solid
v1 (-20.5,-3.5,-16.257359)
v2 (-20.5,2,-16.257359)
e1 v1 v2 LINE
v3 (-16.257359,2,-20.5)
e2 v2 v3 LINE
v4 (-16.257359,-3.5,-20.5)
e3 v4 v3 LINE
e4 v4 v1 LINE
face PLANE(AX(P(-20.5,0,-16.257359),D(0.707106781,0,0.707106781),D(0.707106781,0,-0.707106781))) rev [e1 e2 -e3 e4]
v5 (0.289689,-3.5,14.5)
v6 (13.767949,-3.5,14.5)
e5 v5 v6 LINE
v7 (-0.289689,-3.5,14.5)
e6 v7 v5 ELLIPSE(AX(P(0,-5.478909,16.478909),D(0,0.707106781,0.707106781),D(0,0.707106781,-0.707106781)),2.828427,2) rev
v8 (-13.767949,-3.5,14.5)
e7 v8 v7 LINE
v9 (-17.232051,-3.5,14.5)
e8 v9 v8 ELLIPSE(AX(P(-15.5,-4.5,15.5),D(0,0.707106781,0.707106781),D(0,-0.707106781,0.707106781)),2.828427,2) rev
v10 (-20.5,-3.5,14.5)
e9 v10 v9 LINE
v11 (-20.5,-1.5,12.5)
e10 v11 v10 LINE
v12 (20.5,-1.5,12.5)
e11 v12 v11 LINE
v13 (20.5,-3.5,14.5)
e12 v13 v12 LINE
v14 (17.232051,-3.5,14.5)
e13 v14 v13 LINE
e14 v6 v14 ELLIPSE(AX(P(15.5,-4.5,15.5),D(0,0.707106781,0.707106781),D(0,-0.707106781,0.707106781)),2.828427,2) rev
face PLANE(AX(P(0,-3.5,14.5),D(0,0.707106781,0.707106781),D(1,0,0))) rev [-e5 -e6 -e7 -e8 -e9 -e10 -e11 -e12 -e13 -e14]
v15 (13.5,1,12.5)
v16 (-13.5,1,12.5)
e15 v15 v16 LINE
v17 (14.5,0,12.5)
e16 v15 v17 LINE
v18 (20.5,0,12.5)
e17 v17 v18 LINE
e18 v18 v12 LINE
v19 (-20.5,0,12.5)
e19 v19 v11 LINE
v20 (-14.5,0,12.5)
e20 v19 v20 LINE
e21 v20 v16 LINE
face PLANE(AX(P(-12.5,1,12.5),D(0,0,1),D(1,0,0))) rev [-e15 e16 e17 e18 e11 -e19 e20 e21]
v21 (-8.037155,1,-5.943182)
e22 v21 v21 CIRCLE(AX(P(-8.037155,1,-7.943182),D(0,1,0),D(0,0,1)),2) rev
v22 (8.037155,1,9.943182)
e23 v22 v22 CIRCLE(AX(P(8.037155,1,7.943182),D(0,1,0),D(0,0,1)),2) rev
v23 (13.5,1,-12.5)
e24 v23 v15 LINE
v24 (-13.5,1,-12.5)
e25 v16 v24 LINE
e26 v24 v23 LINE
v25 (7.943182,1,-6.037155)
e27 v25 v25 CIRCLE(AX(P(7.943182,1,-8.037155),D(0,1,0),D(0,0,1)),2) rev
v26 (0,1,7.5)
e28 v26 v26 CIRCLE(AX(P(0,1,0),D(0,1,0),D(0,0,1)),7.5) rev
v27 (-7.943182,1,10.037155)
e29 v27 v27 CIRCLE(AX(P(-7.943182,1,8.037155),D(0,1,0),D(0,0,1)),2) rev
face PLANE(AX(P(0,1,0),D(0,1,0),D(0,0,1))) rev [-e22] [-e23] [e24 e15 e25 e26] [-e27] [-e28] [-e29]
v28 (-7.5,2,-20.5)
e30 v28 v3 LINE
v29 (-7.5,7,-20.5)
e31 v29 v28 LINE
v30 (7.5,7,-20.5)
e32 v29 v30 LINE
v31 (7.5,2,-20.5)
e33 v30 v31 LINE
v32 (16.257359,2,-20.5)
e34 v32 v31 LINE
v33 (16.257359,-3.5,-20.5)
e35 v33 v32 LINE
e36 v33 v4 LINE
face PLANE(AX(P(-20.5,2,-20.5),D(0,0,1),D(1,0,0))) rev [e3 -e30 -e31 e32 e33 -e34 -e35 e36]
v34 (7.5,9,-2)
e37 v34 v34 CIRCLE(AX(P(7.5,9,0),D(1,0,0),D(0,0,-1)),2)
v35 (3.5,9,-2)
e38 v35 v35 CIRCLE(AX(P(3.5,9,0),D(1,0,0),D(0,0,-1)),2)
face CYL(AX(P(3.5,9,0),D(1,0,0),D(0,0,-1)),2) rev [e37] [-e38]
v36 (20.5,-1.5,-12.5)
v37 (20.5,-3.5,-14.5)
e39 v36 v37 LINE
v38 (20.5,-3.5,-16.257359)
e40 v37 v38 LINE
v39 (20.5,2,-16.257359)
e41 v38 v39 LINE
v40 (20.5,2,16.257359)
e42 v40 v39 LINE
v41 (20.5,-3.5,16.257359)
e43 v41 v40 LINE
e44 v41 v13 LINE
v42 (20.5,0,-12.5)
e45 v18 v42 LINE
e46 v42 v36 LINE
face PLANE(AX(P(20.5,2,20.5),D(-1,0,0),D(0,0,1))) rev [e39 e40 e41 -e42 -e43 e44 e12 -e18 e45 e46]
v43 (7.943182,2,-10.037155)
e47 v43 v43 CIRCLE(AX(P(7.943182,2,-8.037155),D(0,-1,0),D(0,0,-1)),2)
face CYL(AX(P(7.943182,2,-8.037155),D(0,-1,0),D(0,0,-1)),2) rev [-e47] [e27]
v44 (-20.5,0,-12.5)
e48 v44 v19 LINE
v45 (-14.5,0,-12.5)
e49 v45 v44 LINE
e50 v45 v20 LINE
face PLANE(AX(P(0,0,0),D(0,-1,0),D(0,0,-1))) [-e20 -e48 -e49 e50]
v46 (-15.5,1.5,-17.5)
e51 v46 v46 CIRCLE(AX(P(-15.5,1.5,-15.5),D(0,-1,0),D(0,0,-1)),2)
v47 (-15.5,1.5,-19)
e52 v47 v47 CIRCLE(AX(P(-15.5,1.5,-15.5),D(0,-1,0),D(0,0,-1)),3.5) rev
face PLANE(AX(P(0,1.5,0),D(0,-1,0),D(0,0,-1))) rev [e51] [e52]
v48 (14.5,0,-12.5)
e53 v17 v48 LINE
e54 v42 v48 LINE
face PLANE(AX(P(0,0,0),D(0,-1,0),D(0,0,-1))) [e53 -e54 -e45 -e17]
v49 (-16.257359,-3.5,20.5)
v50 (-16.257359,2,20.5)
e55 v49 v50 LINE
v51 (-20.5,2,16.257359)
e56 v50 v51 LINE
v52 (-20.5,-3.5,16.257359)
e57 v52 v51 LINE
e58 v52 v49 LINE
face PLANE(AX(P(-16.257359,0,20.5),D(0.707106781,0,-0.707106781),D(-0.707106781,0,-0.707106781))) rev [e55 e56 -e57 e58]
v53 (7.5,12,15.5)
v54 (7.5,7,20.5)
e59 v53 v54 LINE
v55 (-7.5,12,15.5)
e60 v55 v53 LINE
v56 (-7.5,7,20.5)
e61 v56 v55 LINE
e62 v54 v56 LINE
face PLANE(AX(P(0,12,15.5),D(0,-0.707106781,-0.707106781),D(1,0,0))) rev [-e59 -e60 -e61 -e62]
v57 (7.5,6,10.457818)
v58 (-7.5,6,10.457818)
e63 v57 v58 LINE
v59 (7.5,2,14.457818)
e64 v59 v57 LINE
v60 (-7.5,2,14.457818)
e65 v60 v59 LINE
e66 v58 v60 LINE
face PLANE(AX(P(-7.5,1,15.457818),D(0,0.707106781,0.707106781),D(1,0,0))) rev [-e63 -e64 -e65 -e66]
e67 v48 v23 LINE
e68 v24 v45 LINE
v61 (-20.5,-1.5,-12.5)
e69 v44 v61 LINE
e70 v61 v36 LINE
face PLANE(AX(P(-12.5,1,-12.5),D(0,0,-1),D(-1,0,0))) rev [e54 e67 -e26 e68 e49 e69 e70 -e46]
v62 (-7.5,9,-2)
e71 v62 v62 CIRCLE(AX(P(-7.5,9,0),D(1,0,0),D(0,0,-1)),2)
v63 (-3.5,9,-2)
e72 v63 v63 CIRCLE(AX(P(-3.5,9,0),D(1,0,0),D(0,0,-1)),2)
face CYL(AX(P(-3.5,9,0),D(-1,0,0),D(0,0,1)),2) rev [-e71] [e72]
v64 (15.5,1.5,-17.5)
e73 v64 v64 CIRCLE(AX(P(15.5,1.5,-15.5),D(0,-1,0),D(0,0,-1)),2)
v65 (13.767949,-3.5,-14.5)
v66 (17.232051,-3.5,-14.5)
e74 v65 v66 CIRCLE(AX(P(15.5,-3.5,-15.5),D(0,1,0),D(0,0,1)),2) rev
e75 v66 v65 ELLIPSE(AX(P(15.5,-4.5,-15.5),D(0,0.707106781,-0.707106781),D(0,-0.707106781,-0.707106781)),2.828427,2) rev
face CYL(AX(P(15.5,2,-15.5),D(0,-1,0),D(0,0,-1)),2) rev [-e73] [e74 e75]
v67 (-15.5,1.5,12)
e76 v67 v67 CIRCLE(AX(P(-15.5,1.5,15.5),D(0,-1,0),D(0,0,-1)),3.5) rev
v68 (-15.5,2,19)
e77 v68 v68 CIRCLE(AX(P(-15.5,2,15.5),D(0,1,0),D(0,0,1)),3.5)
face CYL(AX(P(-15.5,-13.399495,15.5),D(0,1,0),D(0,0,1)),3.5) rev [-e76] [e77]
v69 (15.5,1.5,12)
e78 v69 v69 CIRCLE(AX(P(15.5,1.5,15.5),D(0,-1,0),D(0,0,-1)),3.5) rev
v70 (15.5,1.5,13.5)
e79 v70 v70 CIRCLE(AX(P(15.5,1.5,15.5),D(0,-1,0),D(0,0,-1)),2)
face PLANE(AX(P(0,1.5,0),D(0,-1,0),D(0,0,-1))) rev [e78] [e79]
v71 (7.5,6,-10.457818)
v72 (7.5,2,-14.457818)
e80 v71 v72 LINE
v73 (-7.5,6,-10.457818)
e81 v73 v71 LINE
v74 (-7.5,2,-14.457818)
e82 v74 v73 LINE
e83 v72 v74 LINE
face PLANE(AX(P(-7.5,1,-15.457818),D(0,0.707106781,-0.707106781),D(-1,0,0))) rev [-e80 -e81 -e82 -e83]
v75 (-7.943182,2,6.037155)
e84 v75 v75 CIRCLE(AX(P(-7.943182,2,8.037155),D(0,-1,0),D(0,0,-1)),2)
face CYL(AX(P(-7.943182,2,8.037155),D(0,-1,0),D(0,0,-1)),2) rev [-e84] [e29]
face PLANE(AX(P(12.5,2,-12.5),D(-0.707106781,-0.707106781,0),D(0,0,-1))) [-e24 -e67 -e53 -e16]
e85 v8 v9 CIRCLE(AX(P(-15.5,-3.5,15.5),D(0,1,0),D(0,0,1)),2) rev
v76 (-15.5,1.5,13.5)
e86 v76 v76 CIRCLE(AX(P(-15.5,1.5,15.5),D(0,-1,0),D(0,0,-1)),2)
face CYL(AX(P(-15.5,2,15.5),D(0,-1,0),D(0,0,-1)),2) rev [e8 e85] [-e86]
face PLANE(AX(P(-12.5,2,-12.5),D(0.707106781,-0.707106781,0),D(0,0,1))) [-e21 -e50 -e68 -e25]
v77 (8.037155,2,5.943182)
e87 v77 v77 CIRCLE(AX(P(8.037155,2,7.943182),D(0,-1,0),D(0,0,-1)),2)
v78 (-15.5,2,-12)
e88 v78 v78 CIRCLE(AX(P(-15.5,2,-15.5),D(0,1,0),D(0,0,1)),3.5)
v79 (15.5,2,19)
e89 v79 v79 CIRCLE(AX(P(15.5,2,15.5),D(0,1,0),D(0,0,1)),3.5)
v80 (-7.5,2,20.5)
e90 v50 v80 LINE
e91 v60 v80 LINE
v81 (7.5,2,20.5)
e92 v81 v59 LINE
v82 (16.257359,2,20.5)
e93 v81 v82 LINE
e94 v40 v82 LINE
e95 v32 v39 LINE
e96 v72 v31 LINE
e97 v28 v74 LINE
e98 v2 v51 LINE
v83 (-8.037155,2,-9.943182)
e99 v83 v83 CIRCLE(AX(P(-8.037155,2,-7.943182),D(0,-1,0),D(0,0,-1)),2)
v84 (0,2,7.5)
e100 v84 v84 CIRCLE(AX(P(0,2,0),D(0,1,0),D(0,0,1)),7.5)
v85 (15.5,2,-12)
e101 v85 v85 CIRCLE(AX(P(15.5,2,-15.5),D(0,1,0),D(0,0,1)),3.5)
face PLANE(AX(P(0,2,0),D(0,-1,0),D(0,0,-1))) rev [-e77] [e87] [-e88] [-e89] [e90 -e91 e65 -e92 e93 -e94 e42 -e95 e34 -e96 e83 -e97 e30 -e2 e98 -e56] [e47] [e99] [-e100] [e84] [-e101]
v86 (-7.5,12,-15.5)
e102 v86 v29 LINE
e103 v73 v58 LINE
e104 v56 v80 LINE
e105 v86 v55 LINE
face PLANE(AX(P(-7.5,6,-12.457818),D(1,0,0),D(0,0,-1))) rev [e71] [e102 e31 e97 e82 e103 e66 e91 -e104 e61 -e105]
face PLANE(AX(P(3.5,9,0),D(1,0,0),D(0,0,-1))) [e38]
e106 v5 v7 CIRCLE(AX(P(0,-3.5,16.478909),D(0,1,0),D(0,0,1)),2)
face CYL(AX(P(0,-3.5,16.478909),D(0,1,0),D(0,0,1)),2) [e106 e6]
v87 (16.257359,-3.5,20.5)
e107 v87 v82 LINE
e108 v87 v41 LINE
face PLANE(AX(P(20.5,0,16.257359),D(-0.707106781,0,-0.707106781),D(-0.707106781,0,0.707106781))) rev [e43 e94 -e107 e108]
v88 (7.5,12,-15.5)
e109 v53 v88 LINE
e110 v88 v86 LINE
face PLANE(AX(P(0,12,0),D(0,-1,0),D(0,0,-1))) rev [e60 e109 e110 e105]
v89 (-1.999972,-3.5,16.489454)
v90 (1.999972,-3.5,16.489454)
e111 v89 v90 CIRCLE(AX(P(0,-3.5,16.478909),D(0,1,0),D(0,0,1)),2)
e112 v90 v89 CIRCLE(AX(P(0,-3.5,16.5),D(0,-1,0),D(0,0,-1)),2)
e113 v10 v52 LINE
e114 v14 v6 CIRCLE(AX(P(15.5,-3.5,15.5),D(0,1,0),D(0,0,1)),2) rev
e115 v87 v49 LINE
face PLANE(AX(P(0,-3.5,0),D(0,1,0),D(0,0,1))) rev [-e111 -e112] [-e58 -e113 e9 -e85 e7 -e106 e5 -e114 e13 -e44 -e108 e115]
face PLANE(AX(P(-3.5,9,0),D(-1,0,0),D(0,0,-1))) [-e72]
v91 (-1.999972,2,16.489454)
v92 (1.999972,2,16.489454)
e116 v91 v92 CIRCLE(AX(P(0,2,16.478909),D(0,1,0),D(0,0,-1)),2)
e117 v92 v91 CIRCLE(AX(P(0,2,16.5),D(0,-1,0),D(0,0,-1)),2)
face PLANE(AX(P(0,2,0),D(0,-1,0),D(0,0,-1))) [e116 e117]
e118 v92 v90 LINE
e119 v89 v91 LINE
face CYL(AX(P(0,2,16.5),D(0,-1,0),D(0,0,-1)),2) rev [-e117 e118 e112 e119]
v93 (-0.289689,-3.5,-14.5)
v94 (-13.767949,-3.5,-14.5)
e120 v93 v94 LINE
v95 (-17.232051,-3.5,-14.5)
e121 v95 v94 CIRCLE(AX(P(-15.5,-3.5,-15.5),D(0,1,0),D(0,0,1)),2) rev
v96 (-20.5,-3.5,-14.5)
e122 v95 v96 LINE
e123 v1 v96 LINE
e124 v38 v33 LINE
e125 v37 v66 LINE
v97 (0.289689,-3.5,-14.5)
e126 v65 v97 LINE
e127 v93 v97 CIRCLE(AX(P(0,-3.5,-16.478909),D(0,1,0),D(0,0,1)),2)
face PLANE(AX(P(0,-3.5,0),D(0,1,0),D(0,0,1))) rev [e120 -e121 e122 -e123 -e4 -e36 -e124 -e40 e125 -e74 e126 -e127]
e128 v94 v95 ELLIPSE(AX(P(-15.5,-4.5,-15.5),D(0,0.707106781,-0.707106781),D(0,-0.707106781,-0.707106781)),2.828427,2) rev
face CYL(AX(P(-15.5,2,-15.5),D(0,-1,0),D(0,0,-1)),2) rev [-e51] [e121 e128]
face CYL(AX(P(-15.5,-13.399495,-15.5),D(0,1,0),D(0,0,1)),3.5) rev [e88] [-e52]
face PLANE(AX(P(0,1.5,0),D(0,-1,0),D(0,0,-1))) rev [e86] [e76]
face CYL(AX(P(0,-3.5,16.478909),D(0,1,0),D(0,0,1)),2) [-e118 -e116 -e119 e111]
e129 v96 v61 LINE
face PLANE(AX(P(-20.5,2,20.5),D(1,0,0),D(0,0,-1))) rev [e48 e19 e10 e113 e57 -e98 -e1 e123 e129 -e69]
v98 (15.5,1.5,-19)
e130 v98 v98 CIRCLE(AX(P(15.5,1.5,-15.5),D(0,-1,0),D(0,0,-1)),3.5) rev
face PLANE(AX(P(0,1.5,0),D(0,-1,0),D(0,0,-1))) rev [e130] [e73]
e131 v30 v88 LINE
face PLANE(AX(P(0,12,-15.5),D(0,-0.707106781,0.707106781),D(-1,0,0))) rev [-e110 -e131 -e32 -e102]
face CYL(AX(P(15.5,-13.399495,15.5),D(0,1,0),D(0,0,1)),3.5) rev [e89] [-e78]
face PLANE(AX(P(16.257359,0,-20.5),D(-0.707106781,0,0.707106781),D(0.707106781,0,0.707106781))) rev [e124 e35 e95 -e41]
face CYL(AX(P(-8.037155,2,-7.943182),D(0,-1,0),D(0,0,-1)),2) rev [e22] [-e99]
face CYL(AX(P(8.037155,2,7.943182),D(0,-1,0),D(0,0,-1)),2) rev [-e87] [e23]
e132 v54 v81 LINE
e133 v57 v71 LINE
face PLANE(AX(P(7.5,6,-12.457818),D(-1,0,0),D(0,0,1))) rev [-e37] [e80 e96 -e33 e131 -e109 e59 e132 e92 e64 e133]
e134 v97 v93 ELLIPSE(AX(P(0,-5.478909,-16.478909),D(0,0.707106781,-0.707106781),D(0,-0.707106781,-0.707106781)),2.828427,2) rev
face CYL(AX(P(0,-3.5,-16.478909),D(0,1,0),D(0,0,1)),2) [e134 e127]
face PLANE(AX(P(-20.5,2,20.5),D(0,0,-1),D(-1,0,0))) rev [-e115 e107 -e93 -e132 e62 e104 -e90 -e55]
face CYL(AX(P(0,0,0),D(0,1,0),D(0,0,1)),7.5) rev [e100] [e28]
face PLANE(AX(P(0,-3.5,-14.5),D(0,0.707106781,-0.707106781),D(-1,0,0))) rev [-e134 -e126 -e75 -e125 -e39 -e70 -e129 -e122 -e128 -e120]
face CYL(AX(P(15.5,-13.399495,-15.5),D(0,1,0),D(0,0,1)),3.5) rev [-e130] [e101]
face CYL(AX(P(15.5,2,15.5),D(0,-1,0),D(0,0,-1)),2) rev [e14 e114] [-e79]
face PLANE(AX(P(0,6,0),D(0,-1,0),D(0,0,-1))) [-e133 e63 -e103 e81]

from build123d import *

# Parameters (mm, degrees)
SKETCH2_W           = 41
SKETCH2_H           = 41
BOSS_EXTRUDE1_DEPTH = 2
SKETCH3_R           = 2
CUT_EXTRUDE1_DEPTH  = 30.060282173
SKETCH4_R           = 7.5
CUT_EXTRUDE2_DEPTH  = 30.060282173
SKETCH5_W           = 25
SKETCH5_H           = 25
CUT_EXTRUDE3_DEPTH  = 1
CUT_EXTRUDE4_DEPTH  = 30.060282173
SKETCH7_R           = 2
CUT_EXTRUDE5_DEPTH  = 30.060282173
SKETCH8_W           = 25
SKETCH8_H           = 8
SKETCH8_H_2         = 7.957817611
BOSS_EXTRUDE2_DEPTH = 3.5
SKETCH9_R           = 2
CUT_EXTRUDE6_DEPTH  = 30.508473359
BOSS_EXTRUDE3_START = 3.5
SKETCH10_R          = 2
BOSS_EXTRUDE3_DEPTH = 3.5
SKETCH11_R          = 3.5
CUT_EXTRUDE7_DEPTH  = 3.5
SKETCH12_W          = 8
SKETCH12_H          = 2
BOSS_EXTRUDE4_DEPTH = 3.5
SKETCH13_R          = 3.5
CUT_EXTRUDE8_DEPTH  = 3.5
SKETCH14_R          = 3.5
SKETCH14_R_2        = 2
BOSS_EXTRUDE5_DEPTH = 3
SKETCH15_W          = 15
SKETCH15_H          = 8.042182389
SKETCH15_R          = 2
SKETCH15_H_2        = 8
BOSS_EXTRUDE6_DEPTH = 4
SKETCH16_W          = 8
SKETCH16_H          = 25
CUT_EXTRUDE9_DEPTH  = 3.5
CHAMFER3_SIZE       = 2
CHAMFER4_SIZE       = 2
SKETCH17_R          = 2
BOSS_EXTRUDE7_DEPTH = 9.5
SKETCH21_W          = 15
SKETCH21_H          = 30.915635222
CUT_EXTRUDE11_DEPTH = 4
SKETCH18_W          = 15
SKETCH18_H          = 41
BOSS_EXTRUDE8_DEPTH = 6
CHAMFER5_SIZE       = 5
SKETCH22_R          = 2
CUT_EXTRUDE12_DEPTH = 4


with BuildPart() as part:
    # Sketch2 → Boss-Extrude1 (new body)
    with BuildSketch(Plane(origin=(0, 0, 0), x_dir=(1, 0, 0), z_dir=(0, 1, 0))):
        Rectangle(SKETCH2_W, SKETCH2_H)
    extrude(amount=BOSS_EXTRUDE1_DEPTH)

    # Sketch3 → Cut-Extrude1 (cut, through all)
    with BuildSketch(Plane.XZ):
        with Locations(Location((-7.943181907, 8.037155044, 0), (0, 0, 270))):
            Circle(SKETCH3_R)
        with Locations(Location((8.037155044, 7.943181907, 0), (0, 0, 270))):
            Circle(SKETCH3_R)
        with Locations(Location((7.943181907, -8.037155044, 0), (0, 0, 270))):
            Circle(SKETCH3_R)
        with Locations(Location((-8.037155044, -7.943181907, 0), (0, 0, 270))):
            Circle(SKETCH3_R)
    extrude(amount=-CUT_EXTRUDE1_DEPTH, mode=Mode.SUBTRACT)

    # Sketch4 → Cut-Extrude2 (cut, through all)
    with BuildSketch(Plane(origin=(0, 2, 0), x_dir=(1, 0, 0), z_dir=(0, 1, 0))):
        with Locations(Location((0, 0, 0), (0, 0, 270))):
            Circle(SKETCH4_R)
    extrude(amount=-CUT_EXTRUDE2_DEPTH, mode=Mode.SUBTRACT)

    # Sketch5 → Cut-Extrude3 (cut)
    with BuildSketch(Plane.XZ):
        Rectangle(SKETCH5_W, SKETCH5_H)
    extrude(amount=-CUT_EXTRUDE3_DEPTH, mode=Mode.SUBTRACT)

    # Sketch6 → Cut-Extrude4 (cut, through all)
    with BuildSketch(Plane(origin=(0, 2, 0), x_dir=(1, 0, 0), z_dir=(0, 1, 0))):
        Polygon((-20.5, 16.257359313), (-16.257359313, 20.5), (-20.5, 20.5), align=None)
        Polygon((16.257359313, 20.5), (20.5, 16.257359313), (20.5, 20.5), align=None)
        Polygon((20.5, -16.257359313), (16.257359313, -20.5), (20.5, -20.5), align=None)
        Polygon((-16.257359313, -20.5), (-20.5, -16.257359313), (-20.5, -20.5), align=None)
    extrude(amount=-CUT_EXTRUDE4_DEPTH, mode=Mode.SUBTRACT)

    # Sketch7 → Cut-Extrude5 (cut, through all)
    with BuildSketch(Plane.XZ):
        with Locations(Location((-15.5, 15.5, 0), (0, 0, 270))):
            Circle(SKETCH7_R)
        with Locations(Location((15.5, 15.5, 0), (0, 0, 270))):
            Circle(SKETCH7_R)
        with Locations(Location((15.5, -15.5, 0), (0, 0, 270))):
            Circle(SKETCH7_R)
        with Locations(Location((-15.5, -15.5, 0), (0, 0, 270))):
            Circle(SKETCH7_R)
    extrude(amount=-CUT_EXTRUDE5_DEPTH, mode=Mode.SUBTRACT)

    # Sketch8 → Boss-Extrude2 (add)
    with BuildSketch(Plane.XZ):
        with Locations((0, 16.5)):
            Rectangle(SKETCH8_W, SKETCH8_H)
        with Locations((0, -16.478908806)):
            Rectangle(SKETCH8_W, SKETCH8_H_2)
    extrude(amount=BOSS_EXTRUDE2_DEPTH)

    # Sketch9 → Cut-Extrude6 (cut, through all)
    with BuildSketch(Plane.XZ.offset(3.5)):
        with Locations(Location((0, 16.5, 0), (0, 0, 270))):
            Circle(SKETCH9_R)
        with Locations(Location((0, -16.478908806, 0), (0, 0, 270))):
            Circle(SKETCH9_R)
    extrude(amount=-CUT_EXTRUDE6_DEPTH, mode=Mode.SUBTRACT)

    # Sketch10 → Boss-Extrude3 (add)
    # profile 1 of 3: a face of its own
    with BuildSketch(Plane.XZ.offset(BOSS_EXTRUDE3_START)):
        Polygon((-20.5, 16.257359313), (-20.5, 12.5), (-12.5, 12.5), (-12.5, 20.5), (-16.257359313, 20.5), align=None)
        with Locations(Location((-15.5, 15.5, 0), (0, 0, 270))):
            Circle(SKETCH10_R, mode=Mode.SUBTRACT)
    # profile 2 of 3: a face of its own
    with BuildSketch(Plane.XZ.offset(BOSS_EXTRUDE3_START)):
        Polygon((12.5, 12.5), (20.5, 12.5), (20.5, 16.257359313), (16.257359313, 20.5), (12.5, 20.5), align=None)
        with Locations(Location((15.5, 15.5, 0), (0, 0, 270))):
            Circle(SKETCH10_R, mode=Mode.SUBTRACT)
    # profile 3 of 3: a face of its own
    with BuildSketch(Plane.XZ.offset(BOSS_EXTRUDE3_START)):
        Polygon((-20.5, -12.5), (-20.5, -16.257359313), (-16.257359313, -20.5), (16.257359313, -20.5), (20.5, -16.257359313), (20.5, -12.5), (12.5, -12.5), (12.5, -20.457817611), (-12.5, -20.457817611), (-12.5, -12.5), align=None)
        with Locations(Location((-15.5, -15.5, 0), (0, 0, 270))):
            Circle(SKETCH10_R, mode=Mode.SUBTRACT)
        with Locations(Location((15.5, -15.5, 0), (0, 0, 270))):
            Circle(SKETCH10_R, mode=Mode.SUBTRACT)
    extrude(amount=-BOSS_EXTRUDE3_DEPTH)

    # Sketch11 → Cut-Extrude7 (cut)
    with BuildSketch(Plane(origin=(0, 2, 0), x_dir=(1, 0, 0), z_dir=(0, 1, 0))):
        with Locations(Location((-15.5, 15.5, 0), (0, 0, 270))):
            Circle(SKETCH11_R)
        with Locations(Location((15.5, 15.5, 0), (0, 0, 270))):
            Circle(SKETCH11_R)
        with Locations(Location((15.5, -15.5, 0), (0, 0, 270))):
            Circle(SKETCH11_R)
        with Locations(Location((-15.5, -15.5, 0), (0, 0, 270))):
            Circle(SKETCH11_R)
    extrude(amount=-CUT_EXTRUDE7_DEPTH, mode=Mode.SUBTRACT)

    # Sketch12 → Boss-Extrude4 (add)
    with BuildSketch(Plane.XZ):
        with Locations((-16.5, -11.5)):
            Rectangle(SKETCH12_W, SKETCH12_H)
        with Locations((-16.5, 11.5)):
            Rectangle(SKETCH12_W, SKETCH12_H)
        with Locations((16.5, -11.5)):
            Rectangle(SKETCH12_W, SKETCH12_H)
        with Locations((16.5, 11.5)):
            Rectangle(SKETCH12_W, SKETCH12_H)
    extrude(amount=BOSS_EXTRUDE4_DEPTH)

    # Sketch13 → Cut-Extrude8 (cut)
    with BuildSketch(Plane(origin=(0, 2, 0), x_dir=(1, 0, 0), z_dir=(0, 1, 0))):
        with Locations(Location((-15.5, 15.5, 0), (0, 0, 270))):
            Circle(SKETCH13_R)
        with Locations(Location((15.5, 15.5, 0), (0, 0, 270))):
            Circle(SKETCH13_R)
        with Locations(Location((15.5, -15.5, 0), (0, 0, 270))):
            Circle(SKETCH13_R)
        with Locations(Location((-15.5, -15.5, 0), (0, 0, 270))):
            Circle(SKETCH13_R)
    extrude(amount=-CUT_EXTRUDE8_DEPTH, mode=Mode.SUBTRACT)

    # Sketch14 → Boss-Extrude5 (add)
    # profile 1 of 4: a face of its own
    with BuildSketch(Plane(origin=(0, -1.5, 0), x_dir=(1, 0, 0), z_dir=(0, 1, 0))):
        with Locations(Location((-15.5, -15.5, 0), (0, 0, 270))):
            Circle(SKETCH14_R)
        with Locations(Location((-15.5, -15.5, 0), (0, 0, 90))):
            Circle(SKETCH14_R_2, mode=Mode.SUBTRACT)
    # profile 2 of 4: a face of its own
    with BuildSketch(Plane(origin=(0, -1.5, 0), x_dir=(1, 0, 0), z_dir=(0, 1, 0))):
        with Locations(Location((-15.5, 15.5, 0), (0, 0, 270))):
            Circle(SKETCH14_R)
        with Locations(Location((-15.5, 15.5, 0), (0, 0, 90))):
            Circle(SKETCH14_R_2, mode=Mode.SUBTRACT)
    # profile 3 of 4: a face of its own
    with BuildSketch(Plane(origin=(0, -1.5, 0), x_dir=(1, 0, 0), z_dir=(0, 1, 0))):
        with Locations(Location((15.5, 15.5, 0), (0, 0, 270))):
            Circle(SKETCH14_R)
        with Locations(Location((15.5, 15.5, 0), (0, 0, 90))):
            Circle(SKETCH14_R_2, mode=Mode.SUBTRACT)
    # profile 4 of 4: a face of its own
    with BuildSketch(Plane(origin=(0, -1.5, 0), x_dir=(1, 0, 0), z_dir=(0, 1, 0))):
        with Locations(Location((15.5, -15.5, 0), (0, 0, 270))):
            Circle(SKETCH14_R)
        with Locations(Location((15.5, -15.5, 0), (0, 0, 90))):
            Circle(SKETCH14_R_2, mode=Mode.SUBTRACT)
    extrude(amount=BOSS_EXTRUDE5_DEPTH)

    # Sketch15 → Boss-Extrude6 (add)
    # profile 1 of 2: a face of its own
    with BuildSketch(Plane(origin=(0, 2, 0), x_dir=(1, 0, 0), z_dir=(0, 1, 0))):
        with Locations((0, 16.478908806)):
            Rectangle(SKETCH15_W, SKETCH15_H)
        with Locations(Location((0, 16.478908806, 0), (0, 0, 90))):
            Circle(SKETCH15_R, mode=Mode.SUBTRACT)
    # profile 2 of 2: a face of its own
    with BuildSketch(Plane(origin=(0, 2, 0), x_dir=(1, 0, 0), z_dir=(0, 1, 0))):
        with Locations((0, -16.5)):
            Rectangle(SKETCH15_W, SKETCH15_H_2)
        with Locations(Location((0, -16.478908806, 0), (0, 0, 90))):
            Circle(SKETCH15_R, mode=Mode.SUBTRACT)
    extrude(amount=BOSS_EXTRUDE6_DEPTH)

    # Sketch16 → Cut-Extrude9 (cut)
    with BuildSketch(Plane.XZ.offset(3.5)):
        with Locations((-16.5, 0)):
            Rectangle(SKETCH16_W, SKETCH16_H)
        with Locations((16.5, 0)):
            Rectangle(SKETCH16_W, SKETCH16_H)
    extrude(amount=-CUT_EXTRUDE9_DEPTH, mode=Mode.SUBTRACT)

    # Chamfer3
    # the kernel refuses this chamfer: 2 mm, written as the material it takes off along each edge
    with BuildSketch(Plane(origin=(-25.643365976, -3.5, 12.5), x_dir=(0, -0.02749587661058627, 0.9996219169112968), z_dir=(1, 0, 0))) as chamfer3_piece_1:
        Polygon((CHAMFER3_SIZE * 0.999621916911, -CHAMFER3_SIZE * 0.0274958766106), (-CHAMFER3_SIZE * 0.0274958766106, -CHAMFER3_SIZE * 0.999621916911), (0, 0), align=None)
    extrude(amount=51.286731952, mode=Mode.SUBTRACT)
    with BuildSketch(Plane(origin=(12.5, -3.5, -12.5), x_dir=(0, -0.02749587661058627, -0.9996219169112968), z_dir=(-1, 0, 0))) as chamfer3_piece_2:
        Polygon((CHAMFER3_SIZE * 0.999621916911, -CHAMFER3_SIZE * 0.0274958766106), (-CHAMFER3_SIZE * 0.0274958766106, -CHAMFER3_SIZE * 0.999621916911), (0, 0), align=None)
    extrude(amount=25, mode=Mode.SUBTRACT)
    with BuildSketch(Plane(origin=(25.643365976, -3.5, -12.5), x_dir=(0, 0.9996219169112968, 0.027495876610586487), z_dir=(-1, 0, 0))) as chamfer3_piece_3:
        Polygon((CHAMFER3_SIZE * 0.999621916911, CHAMFER3_SIZE * 0.0274958766106), (-CHAMFER3_SIZE * 0.0274958766106, CHAMFER3_SIZE * 0.999621916911), (0, 0), align=None)
    extrude(amount=13.143365976, mode=Mode.SUBTRACT)
    with BuildSketch(Plane(origin=(-12.5, -3.5, -12.5), x_dir=(0, -0.02749587661058627, -0.9996219169112968), z_dir=(-1, 0, 0))) as chamfer3_piece_4:
        Polygon((CHAMFER3_SIZE * 0.999621916911, -CHAMFER3_SIZE * 0.0274958766106), (-CHAMFER3_SIZE * 0.0274958766106, -CHAMFER3_SIZE * 0.999621916911), (0, 0), align=None)
    extrude(amount=13.143365976, mode=Mode.SUBTRACT)

    # Chamfer4
    # the kernel refuses this chamfer: 2 mm, written as the material it takes off along each edge
    with BuildSketch(Plane(origin=(12.5, 0, -10.5), x_dir=(0.9996219169112968, -0.027495876610586365, 0), z_dir=(0, 0, 1))) as chamfer4_piece_1_section:
        Polygon((CHAMFER4_SIZE * 0.999621916911, CHAMFER4_SIZE * 0.0274958766106), (-CHAMFER4_SIZE * 0.0274958766106, CHAMFER4_SIZE * 0.999621916911), (0, 0), align=None)
    chamfer4_piece_1 = extrude(amount=21, mode=Mode.PRIVATE)
    chamfer4_piece_1 = split(chamfer4_piece_1, bisect_by=Plane(origin=(13.277777778, 1, 0), z_dir=(0, -1, 0)), keep=Keep.TOP, mode=Mode.PRIVATE)
    add(chamfer4_piece_1, mode=Mode.SUBTRACT)
    with BuildSketch(Plane(origin=(-12.5, 0, 10.5), x_dir=(-0.9996219169112968, -0.027495876610586365, 0), z_dir=(0, 0, -1))) as chamfer4_piece_2_section:
        Polygon((CHAMFER4_SIZE * 0.999621916911, CHAMFER4_SIZE * 0.0274958766106), (-CHAMFER4_SIZE * 0.0274958766106, CHAMFER4_SIZE * 0.999621916911), (0, 0), align=None)
    chamfer4_piece_2 = extrude(amount=21, mode=Mode.PRIVATE)
    chamfer4_piece_2 = split(chamfer4_piece_2, bisect_by=Plane(origin=(-13.277777778, 1, 0), z_dir=(0, -1, 0)), keep=Keep.TOP, mode=Mode.PRIVATE)
    add(chamfer4_piece_2, mode=Mode.SUBTRACT)
    with BuildSketch(Plane(origin=(-12.5, 0, 12.5), x_dir=(-0.9996219169112968, -0.027495876610586365, 0), z_dir=(0, 0, -1))) as chamfer4_piece_3_section:
        Polygon((CHAMFER4_SIZE * 0.999621916911, CHAMFER4_SIZE * 0.0274958766106), (-CHAMFER4_SIZE * 0.0274958766106, CHAMFER4_SIZE * 0.999621916911), (0, 0), align=None)
    chamfer4_piece_3 = extrude(amount=2, mode=Mode.PRIVATE)
    chamfer4_piece_3 = split(chamfer4_piece_3, bisect_by=Plane(origin=(-14.086266388, 1, 12.40211723), z_dir=(0, -1, 0)), keep=Keep.TOP, mode=Mode.PRIVATE)
    add(chamfer4_piece_3, mode=Mode.SUBTRACT)
    with BuildSketch(Plane(origin=(-12.5, 0, -10.5), x_dir=(-0.9996219169112968, -0.027495876610586365, 0), z_dir=(0, 0, -1))) as chamfer4_piece_4_section:
        Polygon((CHAMFER4_SIZE * 0.999621916911, CHAMFER4_SIZE * 0.0274958766106), (-CHAMFER4_SIZE * 0.0274958766106, CHAMFER4_SIZE * 0.999621916911), (0, 0), align=None)
    chamfer4_piece_4 = extrude(amount=2, mode=Mode.PRIVATE)
    chamfer4_piece_4 = split(chamfer4_piece_4, bisect_by=Plane(origin=(-13.265579252, 1, -11.486388799), z_dir=(0, -1, 0)), keep=Keep.TOP, mode=Mode.PRIVATE)
    add(chamfer4_piece_4, mode=Mode.SUBTRACT)
    with BuildSketch(Plane(origin=(12.5, 0, -12.5), x_dir=(0.9996219169112968, -0.02749587661058633, 0), z_dir=(0, 0, 1))) as chamfer4_piece_5_section:
        Polygon((CHAMFER4_SIZE * 0.999621916911, CHAMFER4_SIZE * 0.0274958766106), (-CHAMFER4_SIZE * 0.0274958766106, CHAMFER4_SIZE * 0.999621916911), (0, 0), align=None)
    chamfer4_piece_5 = extrude(amount=2, mode=Mode.PRIVATE)
    chamfer4_piece_5 = split(chamfer4_piece_5, bisect_by=Plane(origin=(14.086266388, 1, -12.40211723), z_dir=(0, -1, 0)), keep=Keep.TOP, mode=Mode.PRIVATE)
    add(chamfer4_piece_5, mode=Mode.SUBTRACT)
    with BuildSketch(Plane(origin=(12.5, 0, 10.5), x_dir=(0.9996219169112968, -0.027495876610586344, 0), z_dir=(0, 0, 1))) as chamfer4_piece_6_section:
        Polygon((CHAMFER4_SIZE * 0.999621916911, CHAMFER4_SIZE * 0.0274958766106), (-CHAMFER4_SIZE * 0.0274958766106, CHAMFER4_SIZE * 0.999621916911), (0, 0), align=None)
    chamfer4_piece_6 = extrude(amount=2, mode=Mode.PRIVATE)
    chamfer4_piece_6 = split(chamfer4_piece_6, bisect_by=Plane(origin=(13.265579252, 1, 11.486388799), z_dir=(0, -1, 0)), keep=Keep.TOP, mode=Mode.PRIVATE)
    add(chamfer4_piece_6, mode=Mode.SUBTRACT)

    # Sketch17 → Boss-Extrude7 (add, through all)
    with BuildSketch(Plane(origin=(0, 6, 0), x_dir=(1, 0, 0), z_dir=(0, 1, 0))):
        with Locations((0, 16.478908806)):
            Circle(SKETCH17_R)
        with Locations((0, -16.478908806)):
            Circle(SKETCH17_R)
    extrude(amount=-BOSS_EXTRUDE7_DEPTH)

    # Sketch21 → Cut-Extrude11 (cut)
    with BuildSketch(Plane(origin=(0, 6, 0), x_dir=(1, 0, 0), z_dir=(0, 1, 0))):
        Rectangle(SKETCH21_W, SKETCH21_H)
    extrude(amount=-CUT_EXTRUDE11_DEPTH, mode=Mode.SUBTRACT)

    # Sketch18 → Boss-Extrude8 (add)
    with BuildSketch(Plane(origin=(0, 6, 0), x_dir=(1, 0, 0), z_dir=(0, 1, 0))):
        Rectangle(SKETCH18_W, SKETCH18_H)
    extrude(amount=BOSS_EXTRUDE8_DEPTH)

    # Chamfer5
    # the kernel refuses this chamfer: 5 mm, written as the material it adds along each edge
    with BuildSketch(Plane(origin=(-7.5, 6, 15.457817611), x_dir=(0, -0.9996219169112968, 0.027495876610586317), z_dir=(1, 0, 0))) as chamfer5_piece_1:
        Polygon((CHAMFER5_SIZE * 0.999621916911, CHAMFER5_SIZE * 0.0274958766106), (-CHAMFER5_SIZE * 0.0274958766106, CHAMFER5_SIZE * 0.999621916911), (0, 0), align=None)
    extrude(amount=15)
    with BuildSketch(Plane(origin=(7.5, 6, -15.457817611), x_dir=(0, 0.027495876610586317, 0.9996219169112968), z_dir=(-1, 0, 0))) as chamfer5_piece_2:
        Polygon((CHAMFER5_SIZE * 0.999621916911, -CHAMFER5_SIZE * 0.0274958766106), (-CHAMFER5_SIZE * 0.0274958766106, -CHAMFER5_SIZE * 0.999621916911), (0, 0), align=None)
    extrude(amount=15)
    # the kernel refuses this chamfer: 5 mm, written as the material it takes off along each edge
    with BuildSketch(Plane(origin=(20.35841494, 12, -20.5), x_dir=(0, -0.9996219169112968, -0.027495876610586317), z_dir=(-1, 0, 0)), Plane(origin=(-20.35841494, 12, 20.5), x_dir=(0, -0.9996219169112968, 0.027495876610586317), z_dir=(1, 0, 0))) as chamfer5_2_piece_1:
        Polygon((CHAMFER5_SIZE * 0.999621916911, CHAMFER5_SIZE * 0.0274958766106), (-CHAMFER5_SIZE * 0.0274958766106, CHAMFER5_SIZE * 0.999621916911), (0, 0), align=None)
    extrude(amount=40.71682988, mode=Mode.SUBTRACT)

    # Sketch22 → Cut-Extrude12 (cut)
    with BuildSketch(Plane(origin=(7.5, 0, 0), x_dir=(0, 0, -1), z_dir=(1, 0, 0))):
        with Locations((0, 9)):
            Circle(SKETCH22_R)
    cut_extrude12 = extrude(amount=-CUT_EXTRUDE12_DEPTH, mode=Mode.SUBTRACT)

    # Mirror1: Cut-Extrude12 across plane
    add(cut_extrude12.mirror(Plane(origin=(0, 0, 0), x_dir=(0, 0, 1), z_dir=(1, 0, 0))), mode=Mode.SUBTRACT)


solid = part.part
